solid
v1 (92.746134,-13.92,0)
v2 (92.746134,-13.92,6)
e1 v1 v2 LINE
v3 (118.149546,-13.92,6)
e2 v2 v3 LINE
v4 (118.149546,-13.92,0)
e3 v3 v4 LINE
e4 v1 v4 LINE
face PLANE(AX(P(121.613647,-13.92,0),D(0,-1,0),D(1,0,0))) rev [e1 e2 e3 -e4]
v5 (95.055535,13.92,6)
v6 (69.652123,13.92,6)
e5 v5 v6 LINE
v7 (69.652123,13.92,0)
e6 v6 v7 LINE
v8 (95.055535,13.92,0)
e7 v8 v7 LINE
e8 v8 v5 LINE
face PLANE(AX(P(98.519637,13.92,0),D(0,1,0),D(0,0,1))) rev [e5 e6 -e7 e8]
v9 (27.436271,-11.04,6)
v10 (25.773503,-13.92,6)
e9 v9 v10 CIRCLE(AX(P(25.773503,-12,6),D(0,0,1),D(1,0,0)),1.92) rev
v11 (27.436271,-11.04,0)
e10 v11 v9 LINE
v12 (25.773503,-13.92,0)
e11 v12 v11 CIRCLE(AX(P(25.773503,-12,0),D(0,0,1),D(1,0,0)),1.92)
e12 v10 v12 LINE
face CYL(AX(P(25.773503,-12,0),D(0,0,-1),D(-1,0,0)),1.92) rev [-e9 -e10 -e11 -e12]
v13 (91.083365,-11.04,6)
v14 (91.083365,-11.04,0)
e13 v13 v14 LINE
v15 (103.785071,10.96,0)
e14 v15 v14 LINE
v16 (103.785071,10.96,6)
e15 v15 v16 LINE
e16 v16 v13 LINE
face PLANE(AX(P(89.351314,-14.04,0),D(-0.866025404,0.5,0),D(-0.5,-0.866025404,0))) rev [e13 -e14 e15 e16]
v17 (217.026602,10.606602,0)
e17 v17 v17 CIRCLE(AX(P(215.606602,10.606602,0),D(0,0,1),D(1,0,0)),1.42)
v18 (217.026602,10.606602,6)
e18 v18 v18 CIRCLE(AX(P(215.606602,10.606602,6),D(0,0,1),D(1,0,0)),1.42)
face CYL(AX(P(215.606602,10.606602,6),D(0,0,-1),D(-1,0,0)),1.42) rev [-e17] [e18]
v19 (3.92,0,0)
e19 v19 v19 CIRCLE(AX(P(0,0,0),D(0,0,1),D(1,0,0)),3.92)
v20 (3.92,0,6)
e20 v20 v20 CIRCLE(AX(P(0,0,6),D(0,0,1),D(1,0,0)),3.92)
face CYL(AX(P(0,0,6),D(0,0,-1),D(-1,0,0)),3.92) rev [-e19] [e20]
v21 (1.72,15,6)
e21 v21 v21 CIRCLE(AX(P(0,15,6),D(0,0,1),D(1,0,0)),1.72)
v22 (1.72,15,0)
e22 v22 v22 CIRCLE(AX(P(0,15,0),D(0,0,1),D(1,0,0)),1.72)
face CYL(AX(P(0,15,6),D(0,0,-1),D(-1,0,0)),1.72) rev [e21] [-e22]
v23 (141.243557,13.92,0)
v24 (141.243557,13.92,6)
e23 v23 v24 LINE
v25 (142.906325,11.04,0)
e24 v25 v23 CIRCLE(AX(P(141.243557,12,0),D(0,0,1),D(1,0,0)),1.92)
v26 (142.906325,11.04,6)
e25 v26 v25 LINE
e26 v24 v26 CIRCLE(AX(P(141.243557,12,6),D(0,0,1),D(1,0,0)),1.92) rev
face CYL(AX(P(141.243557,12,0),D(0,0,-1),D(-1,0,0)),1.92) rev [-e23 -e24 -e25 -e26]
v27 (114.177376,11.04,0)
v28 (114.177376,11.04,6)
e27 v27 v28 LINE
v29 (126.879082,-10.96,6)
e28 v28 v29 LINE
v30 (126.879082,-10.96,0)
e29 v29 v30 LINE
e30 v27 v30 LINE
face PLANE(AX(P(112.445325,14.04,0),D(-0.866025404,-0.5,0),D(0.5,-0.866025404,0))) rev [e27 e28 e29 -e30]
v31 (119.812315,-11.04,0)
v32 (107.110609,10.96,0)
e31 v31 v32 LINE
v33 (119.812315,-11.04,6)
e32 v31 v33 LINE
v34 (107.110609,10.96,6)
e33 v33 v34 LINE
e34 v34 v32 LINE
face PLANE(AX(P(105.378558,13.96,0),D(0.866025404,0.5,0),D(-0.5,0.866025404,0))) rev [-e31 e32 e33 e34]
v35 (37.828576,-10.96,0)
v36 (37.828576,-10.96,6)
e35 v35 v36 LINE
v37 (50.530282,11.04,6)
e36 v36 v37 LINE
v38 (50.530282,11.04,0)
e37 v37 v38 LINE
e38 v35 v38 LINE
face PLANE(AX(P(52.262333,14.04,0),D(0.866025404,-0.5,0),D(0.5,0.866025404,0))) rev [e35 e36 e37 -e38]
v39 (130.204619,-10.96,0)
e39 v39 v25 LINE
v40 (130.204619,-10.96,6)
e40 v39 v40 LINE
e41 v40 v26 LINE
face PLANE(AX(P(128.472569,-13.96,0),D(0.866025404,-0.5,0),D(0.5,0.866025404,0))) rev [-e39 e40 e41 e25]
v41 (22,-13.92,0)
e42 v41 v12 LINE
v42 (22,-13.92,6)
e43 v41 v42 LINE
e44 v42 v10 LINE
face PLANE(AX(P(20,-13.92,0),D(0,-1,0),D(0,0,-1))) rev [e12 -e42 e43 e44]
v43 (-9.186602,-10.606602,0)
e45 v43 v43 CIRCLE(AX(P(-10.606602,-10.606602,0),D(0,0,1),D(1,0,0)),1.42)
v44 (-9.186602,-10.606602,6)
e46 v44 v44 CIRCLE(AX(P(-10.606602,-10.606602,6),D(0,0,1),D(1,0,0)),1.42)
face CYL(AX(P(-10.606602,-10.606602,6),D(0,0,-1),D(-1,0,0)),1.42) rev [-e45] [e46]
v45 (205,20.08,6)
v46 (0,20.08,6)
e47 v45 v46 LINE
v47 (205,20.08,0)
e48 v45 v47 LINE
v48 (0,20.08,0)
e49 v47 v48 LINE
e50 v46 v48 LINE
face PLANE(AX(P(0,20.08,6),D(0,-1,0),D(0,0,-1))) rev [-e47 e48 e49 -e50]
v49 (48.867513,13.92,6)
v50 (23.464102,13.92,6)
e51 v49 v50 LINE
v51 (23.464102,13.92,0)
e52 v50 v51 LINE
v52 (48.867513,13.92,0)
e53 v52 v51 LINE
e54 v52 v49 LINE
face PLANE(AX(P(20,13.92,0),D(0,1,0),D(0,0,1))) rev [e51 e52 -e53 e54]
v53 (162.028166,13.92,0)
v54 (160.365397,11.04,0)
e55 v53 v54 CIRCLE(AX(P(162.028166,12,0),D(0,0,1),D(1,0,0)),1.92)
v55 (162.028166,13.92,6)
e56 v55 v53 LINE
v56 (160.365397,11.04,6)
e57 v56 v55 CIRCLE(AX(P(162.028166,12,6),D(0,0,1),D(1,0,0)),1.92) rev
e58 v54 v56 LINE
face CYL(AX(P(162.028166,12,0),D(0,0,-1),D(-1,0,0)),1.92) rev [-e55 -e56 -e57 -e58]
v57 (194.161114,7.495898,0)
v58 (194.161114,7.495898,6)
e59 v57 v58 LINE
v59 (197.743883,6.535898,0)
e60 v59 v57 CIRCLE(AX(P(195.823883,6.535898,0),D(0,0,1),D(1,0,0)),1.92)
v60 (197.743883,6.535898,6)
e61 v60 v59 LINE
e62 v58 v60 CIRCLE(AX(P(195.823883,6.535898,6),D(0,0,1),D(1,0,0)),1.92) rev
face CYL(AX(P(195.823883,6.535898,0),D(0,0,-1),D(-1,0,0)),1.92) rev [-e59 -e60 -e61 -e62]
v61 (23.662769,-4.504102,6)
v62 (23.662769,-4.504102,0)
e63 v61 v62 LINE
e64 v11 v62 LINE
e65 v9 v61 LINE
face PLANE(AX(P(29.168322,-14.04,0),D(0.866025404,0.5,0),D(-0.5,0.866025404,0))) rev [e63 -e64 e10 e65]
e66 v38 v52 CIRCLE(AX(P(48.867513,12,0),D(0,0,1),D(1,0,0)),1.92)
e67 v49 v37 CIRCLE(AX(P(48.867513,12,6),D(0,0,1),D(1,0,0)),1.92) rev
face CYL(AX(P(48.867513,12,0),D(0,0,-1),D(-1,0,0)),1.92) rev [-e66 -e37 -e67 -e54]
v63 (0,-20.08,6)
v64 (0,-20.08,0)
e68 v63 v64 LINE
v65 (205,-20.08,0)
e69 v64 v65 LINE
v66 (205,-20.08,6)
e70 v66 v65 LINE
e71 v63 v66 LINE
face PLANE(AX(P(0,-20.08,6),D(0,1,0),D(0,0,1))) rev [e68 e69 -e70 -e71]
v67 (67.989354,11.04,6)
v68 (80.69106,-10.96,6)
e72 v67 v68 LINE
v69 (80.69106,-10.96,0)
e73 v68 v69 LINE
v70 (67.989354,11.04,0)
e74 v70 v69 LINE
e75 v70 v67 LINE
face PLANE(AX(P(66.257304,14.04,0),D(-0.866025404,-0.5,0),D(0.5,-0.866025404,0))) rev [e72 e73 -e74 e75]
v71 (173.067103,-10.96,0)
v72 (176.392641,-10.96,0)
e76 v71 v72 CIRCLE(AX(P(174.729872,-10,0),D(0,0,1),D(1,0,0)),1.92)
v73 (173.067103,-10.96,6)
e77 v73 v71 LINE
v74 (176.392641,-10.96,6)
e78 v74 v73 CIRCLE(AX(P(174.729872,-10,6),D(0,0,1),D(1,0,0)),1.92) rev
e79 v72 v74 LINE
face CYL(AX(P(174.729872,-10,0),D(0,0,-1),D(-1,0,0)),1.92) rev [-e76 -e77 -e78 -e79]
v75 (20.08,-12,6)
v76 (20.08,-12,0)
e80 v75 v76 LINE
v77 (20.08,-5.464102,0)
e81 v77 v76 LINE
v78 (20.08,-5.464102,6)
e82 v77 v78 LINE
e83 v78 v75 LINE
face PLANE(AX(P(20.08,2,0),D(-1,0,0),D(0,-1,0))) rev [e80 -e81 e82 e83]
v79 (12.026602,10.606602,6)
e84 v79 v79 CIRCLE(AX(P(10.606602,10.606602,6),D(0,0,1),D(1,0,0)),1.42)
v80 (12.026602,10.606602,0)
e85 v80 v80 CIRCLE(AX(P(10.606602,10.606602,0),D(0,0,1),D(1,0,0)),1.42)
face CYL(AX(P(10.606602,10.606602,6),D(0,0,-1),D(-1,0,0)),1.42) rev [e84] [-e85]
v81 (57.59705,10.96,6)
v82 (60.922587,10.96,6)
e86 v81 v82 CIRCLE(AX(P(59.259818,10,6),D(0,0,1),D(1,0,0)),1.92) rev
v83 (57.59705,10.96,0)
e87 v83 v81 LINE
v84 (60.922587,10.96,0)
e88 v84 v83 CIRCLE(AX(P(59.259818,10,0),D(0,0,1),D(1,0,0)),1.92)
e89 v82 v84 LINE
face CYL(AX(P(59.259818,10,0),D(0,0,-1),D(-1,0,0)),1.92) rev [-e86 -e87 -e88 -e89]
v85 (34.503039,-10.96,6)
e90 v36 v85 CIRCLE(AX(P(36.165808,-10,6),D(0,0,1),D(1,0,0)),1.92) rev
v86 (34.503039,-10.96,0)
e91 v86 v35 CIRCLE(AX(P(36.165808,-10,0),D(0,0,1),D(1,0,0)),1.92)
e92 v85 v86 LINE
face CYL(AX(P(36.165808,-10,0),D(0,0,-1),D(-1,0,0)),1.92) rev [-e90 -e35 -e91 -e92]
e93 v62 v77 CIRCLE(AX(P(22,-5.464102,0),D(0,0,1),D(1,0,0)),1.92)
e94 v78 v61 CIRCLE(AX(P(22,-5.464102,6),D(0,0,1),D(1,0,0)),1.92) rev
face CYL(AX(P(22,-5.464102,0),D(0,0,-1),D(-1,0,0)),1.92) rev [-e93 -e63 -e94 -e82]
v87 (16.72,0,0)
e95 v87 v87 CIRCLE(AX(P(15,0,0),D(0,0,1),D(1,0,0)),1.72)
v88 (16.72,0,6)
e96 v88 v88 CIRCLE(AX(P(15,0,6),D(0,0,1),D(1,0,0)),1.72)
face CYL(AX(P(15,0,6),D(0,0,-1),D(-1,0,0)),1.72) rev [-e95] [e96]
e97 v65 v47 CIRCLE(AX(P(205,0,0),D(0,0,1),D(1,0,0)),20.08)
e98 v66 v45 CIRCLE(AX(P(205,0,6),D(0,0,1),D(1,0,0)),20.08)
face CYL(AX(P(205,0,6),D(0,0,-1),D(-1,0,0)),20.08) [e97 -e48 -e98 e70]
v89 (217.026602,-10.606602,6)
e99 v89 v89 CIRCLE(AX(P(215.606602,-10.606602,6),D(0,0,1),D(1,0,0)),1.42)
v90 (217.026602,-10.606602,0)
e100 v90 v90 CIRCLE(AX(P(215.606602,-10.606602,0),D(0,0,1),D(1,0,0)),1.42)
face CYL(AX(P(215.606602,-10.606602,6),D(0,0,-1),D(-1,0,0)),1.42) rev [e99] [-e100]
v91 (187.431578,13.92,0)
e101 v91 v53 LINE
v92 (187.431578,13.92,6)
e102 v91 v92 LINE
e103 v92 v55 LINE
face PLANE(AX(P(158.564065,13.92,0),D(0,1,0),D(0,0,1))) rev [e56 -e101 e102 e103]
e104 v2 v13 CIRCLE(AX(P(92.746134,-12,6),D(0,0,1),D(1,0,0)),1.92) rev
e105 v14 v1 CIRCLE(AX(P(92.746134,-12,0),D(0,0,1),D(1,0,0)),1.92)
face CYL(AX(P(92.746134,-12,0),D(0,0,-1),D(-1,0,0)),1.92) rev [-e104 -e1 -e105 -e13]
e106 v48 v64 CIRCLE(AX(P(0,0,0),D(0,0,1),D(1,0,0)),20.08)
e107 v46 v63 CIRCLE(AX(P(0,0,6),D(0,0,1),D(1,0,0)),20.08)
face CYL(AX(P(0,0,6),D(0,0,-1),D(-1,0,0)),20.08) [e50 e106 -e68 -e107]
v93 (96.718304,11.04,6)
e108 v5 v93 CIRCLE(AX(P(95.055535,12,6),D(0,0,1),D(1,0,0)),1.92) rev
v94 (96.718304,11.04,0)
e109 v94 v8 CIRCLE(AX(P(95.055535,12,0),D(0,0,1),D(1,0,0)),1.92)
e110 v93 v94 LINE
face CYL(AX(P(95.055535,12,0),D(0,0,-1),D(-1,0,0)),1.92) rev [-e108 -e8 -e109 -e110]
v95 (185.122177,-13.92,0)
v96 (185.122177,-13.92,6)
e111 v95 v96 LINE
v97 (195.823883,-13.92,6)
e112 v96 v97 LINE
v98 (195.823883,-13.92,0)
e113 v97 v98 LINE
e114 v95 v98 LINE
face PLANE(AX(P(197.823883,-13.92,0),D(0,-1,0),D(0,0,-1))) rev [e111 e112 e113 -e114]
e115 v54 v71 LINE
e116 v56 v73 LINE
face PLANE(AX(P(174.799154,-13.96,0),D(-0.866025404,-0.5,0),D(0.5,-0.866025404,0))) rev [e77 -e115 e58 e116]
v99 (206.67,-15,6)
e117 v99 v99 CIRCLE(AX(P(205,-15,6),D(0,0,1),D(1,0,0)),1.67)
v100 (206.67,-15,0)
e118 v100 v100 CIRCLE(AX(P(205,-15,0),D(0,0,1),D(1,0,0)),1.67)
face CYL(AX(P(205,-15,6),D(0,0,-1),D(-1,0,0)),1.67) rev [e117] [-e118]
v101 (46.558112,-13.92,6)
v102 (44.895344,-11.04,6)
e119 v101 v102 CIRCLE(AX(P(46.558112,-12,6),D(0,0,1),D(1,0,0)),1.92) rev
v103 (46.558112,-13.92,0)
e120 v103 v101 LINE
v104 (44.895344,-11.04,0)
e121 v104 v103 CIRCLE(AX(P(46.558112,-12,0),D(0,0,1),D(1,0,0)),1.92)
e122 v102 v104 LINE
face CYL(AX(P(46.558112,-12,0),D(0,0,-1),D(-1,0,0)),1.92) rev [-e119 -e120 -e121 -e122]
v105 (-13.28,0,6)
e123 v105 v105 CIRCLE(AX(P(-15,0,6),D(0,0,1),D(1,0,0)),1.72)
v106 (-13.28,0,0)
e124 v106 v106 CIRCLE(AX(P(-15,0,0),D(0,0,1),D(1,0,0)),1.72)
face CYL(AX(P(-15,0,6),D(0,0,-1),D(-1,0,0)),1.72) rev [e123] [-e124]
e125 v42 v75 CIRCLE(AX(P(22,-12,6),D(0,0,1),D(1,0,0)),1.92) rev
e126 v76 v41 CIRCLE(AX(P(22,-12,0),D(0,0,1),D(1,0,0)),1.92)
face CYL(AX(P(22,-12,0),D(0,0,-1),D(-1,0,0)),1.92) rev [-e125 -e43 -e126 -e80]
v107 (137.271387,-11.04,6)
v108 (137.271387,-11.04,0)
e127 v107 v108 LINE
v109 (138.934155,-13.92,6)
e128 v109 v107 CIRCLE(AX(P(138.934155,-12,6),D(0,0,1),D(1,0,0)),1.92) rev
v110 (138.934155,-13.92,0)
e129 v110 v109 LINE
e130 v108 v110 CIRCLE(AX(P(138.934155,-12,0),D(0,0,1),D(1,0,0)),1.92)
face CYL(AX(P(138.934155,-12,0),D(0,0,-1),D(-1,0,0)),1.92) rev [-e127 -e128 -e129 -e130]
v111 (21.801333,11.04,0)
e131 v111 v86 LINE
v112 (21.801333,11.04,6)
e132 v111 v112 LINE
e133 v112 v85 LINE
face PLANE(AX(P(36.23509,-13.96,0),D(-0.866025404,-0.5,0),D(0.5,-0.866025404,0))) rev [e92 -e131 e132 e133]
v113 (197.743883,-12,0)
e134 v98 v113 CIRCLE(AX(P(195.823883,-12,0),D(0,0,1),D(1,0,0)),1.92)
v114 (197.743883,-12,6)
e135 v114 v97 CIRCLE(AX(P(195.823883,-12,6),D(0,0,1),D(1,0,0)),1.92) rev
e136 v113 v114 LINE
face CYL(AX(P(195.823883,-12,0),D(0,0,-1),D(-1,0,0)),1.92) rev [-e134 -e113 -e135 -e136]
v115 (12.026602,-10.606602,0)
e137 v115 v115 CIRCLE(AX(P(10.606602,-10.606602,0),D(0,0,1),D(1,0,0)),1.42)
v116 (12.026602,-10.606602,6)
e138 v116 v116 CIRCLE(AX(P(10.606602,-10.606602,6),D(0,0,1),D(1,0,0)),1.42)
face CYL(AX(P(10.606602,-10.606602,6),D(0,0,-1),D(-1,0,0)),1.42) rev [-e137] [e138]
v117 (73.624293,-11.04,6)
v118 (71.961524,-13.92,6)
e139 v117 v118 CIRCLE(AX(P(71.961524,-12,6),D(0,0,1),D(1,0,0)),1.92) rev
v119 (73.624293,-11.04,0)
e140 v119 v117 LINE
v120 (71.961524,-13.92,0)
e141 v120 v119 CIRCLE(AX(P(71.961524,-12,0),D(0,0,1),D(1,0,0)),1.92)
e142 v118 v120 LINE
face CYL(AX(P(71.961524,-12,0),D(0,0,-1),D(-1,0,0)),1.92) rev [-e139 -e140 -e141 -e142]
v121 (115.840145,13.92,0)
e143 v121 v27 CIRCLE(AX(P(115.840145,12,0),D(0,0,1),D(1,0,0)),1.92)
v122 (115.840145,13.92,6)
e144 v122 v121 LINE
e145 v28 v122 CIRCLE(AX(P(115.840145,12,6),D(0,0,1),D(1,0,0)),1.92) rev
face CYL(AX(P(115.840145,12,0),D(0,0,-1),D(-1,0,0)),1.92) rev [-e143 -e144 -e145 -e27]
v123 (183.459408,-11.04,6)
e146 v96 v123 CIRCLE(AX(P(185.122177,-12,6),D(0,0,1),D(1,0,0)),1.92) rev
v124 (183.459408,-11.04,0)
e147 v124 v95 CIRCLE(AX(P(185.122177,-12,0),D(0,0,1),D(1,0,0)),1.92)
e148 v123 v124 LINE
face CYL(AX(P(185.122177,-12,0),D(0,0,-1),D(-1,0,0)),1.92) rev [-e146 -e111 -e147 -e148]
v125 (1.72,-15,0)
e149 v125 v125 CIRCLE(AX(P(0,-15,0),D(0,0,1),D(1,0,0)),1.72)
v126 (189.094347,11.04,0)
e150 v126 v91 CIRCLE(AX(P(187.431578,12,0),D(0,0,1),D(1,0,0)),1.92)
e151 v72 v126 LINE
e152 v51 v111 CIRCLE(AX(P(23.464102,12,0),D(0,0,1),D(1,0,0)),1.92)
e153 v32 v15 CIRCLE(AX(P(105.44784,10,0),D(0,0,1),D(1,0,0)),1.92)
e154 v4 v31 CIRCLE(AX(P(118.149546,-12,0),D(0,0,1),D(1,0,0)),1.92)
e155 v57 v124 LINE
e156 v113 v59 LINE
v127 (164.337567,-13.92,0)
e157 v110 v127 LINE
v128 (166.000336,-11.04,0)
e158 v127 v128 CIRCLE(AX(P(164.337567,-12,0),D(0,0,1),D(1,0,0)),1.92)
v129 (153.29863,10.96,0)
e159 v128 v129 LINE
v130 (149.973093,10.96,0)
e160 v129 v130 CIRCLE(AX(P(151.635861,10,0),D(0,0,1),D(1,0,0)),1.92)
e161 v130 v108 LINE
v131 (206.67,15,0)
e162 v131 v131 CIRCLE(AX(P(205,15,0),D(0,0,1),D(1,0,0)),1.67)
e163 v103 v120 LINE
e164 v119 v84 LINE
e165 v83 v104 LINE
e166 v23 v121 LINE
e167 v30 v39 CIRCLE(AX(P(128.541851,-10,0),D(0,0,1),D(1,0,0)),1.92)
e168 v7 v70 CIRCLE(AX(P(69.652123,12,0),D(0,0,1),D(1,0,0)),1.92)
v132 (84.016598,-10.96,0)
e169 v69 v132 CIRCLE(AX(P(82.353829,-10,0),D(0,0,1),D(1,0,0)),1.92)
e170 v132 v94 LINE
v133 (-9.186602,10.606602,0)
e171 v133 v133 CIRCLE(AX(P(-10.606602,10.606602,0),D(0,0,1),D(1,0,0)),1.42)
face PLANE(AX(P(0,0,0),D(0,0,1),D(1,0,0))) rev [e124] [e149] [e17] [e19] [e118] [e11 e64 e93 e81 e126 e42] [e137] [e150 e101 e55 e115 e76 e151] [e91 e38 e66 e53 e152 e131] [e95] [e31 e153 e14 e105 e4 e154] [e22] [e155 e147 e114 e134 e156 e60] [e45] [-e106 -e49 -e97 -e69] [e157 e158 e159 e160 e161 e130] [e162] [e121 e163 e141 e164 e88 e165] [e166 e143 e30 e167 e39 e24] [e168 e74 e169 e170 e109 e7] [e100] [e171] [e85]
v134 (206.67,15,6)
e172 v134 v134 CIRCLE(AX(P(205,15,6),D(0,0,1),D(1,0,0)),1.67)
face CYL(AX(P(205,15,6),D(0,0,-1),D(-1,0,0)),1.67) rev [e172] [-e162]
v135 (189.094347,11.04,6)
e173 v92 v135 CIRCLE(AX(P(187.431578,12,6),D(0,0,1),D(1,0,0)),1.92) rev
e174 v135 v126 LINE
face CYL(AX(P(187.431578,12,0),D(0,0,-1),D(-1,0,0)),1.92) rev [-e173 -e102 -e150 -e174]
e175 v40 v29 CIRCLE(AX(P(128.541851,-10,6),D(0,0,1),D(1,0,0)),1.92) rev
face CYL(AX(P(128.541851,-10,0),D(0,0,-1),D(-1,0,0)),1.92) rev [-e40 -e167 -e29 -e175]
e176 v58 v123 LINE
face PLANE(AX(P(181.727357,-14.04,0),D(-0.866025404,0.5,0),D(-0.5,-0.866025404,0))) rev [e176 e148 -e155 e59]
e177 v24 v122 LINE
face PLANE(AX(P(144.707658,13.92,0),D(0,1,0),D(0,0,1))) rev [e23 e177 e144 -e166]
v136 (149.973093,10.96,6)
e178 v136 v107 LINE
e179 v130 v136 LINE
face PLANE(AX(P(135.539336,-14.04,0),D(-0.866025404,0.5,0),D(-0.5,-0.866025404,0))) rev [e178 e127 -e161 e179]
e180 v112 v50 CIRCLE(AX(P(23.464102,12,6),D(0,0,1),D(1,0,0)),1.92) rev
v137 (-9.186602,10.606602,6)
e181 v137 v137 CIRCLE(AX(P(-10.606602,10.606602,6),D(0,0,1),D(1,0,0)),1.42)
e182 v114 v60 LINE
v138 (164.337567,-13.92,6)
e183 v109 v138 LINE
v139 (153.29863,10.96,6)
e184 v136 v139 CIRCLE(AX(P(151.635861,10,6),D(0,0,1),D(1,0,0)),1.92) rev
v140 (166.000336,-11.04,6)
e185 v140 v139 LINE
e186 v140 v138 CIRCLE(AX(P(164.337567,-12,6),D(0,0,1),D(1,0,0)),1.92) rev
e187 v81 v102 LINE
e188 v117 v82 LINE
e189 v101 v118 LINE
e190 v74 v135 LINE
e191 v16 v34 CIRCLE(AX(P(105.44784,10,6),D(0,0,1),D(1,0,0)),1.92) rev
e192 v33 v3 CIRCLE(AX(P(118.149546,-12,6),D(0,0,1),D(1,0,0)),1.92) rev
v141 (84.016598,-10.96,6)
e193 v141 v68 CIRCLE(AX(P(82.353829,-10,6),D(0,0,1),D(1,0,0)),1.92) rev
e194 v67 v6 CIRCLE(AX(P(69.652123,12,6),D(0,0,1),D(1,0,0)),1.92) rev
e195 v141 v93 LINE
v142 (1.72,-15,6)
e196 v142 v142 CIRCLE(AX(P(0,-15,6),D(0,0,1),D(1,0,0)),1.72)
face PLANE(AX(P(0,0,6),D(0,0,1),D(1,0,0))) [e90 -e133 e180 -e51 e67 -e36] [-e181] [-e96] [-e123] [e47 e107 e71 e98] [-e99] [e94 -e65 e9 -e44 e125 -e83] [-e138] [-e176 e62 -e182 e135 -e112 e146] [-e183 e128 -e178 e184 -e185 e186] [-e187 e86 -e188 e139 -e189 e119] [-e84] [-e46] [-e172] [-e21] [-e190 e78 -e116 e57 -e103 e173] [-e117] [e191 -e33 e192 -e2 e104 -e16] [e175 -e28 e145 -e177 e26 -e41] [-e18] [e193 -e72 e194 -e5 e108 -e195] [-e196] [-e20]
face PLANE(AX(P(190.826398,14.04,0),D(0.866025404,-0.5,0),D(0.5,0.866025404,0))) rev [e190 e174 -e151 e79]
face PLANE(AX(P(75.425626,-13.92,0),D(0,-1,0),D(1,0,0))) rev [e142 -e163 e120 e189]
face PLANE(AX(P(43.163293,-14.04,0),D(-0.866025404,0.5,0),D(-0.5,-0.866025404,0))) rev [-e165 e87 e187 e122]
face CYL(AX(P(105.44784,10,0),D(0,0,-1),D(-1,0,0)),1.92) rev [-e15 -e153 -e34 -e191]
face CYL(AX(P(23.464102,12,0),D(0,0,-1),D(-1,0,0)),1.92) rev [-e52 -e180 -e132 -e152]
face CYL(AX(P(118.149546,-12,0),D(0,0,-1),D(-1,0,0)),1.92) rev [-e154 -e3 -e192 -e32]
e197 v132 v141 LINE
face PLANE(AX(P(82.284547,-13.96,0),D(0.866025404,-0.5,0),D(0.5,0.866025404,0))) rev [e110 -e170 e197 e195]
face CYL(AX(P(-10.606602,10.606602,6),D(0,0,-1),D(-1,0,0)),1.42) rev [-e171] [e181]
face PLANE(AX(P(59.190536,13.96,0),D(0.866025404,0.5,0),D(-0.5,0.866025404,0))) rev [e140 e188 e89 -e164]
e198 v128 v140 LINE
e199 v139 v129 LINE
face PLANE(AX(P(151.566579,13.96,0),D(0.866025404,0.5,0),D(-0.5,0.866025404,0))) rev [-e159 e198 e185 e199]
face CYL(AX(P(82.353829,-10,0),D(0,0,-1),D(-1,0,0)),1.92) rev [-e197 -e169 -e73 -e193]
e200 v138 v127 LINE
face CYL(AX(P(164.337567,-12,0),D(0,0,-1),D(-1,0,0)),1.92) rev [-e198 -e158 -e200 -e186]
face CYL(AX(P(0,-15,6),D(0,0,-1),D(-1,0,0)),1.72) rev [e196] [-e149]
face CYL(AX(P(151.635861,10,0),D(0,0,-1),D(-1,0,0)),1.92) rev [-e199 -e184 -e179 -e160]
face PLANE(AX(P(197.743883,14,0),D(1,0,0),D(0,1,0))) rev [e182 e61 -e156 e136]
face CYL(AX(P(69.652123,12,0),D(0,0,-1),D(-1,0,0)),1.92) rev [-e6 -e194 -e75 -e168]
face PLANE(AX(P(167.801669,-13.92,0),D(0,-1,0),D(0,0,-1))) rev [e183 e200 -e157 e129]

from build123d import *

# Parameters (mm, degrees)
SKETCH1_R              = 4
SKETCH1_R_2            = 1.75
SKETCH1_R_3            = 1.5
SKETCH1_R_4            = 1.8
BOSS_EXTRUDE1_DEPTH    = 6
CUT_EXTRUDE1_DEPTH     = 226.966811722
FILLET1_R              = 2
MOVE_FACE1_OUTLINE_R   = 4
MOVE_FACE1_OUTLINE_R_2 = 3.92
MOVE_FACE1_OUTLINE_R_3 = 1.75
MOVE_FACE1_OUTLINE_R_4 = 1.67
MOVE_FACE1_OUTLINE_R_5 = 1.5
MOVE_FACE1_OUTLINE_R_6 = 1.42
MOVE_FACE1_OUTLINE_R_7 = 1.8
MOVE_FACE1_OUTLINE_R_8 = 1.72
MOVE_FACE1_DEPTH       = 6


# Read off the part's stored shape, not the designer's step: Move Face1
with BuildPart() as part:
    # Sketch1 → Boss-Extrude1 (new body)
    with BuildSketch(Plane.XY):
        with BuildLine():
            Line((0, -20), (205, -20))
            ThreePointArc((205, -20), (225, 0), (205, 20))
            Line((205, 20), (0, 20))
            ThreePointArc((0, 20), (-20, 0), (0, -20))
        make_face()
        Circle(SKETCH1_R, mode=Mode.SUBTRACT)
        with Locations((205, -15)):
            Circle(SKETCH1_R_2, mode=Mode.SUBTRACT)
        with Locations((215.606601718, -10.606601718)):
            Circle(SKETCH1_R_3, mode=Mode.SUBTRACT)
        with Locations((205, 15)):
            Circle(SKETCH1_R_2, mode=Mode.SUBTRACT)
        with Locations((215.606601718, 10.606601718)):
            Circle(SKETCH1_R_3, mode=Mode.SUBTRACT)
        with Locations((0, -15)):
            Circle(SKETCH1_R_4, mode=Mode.SUBTRACT)
        with Locations((10.606601718, -10.606601718)):
            Circle(SKETCH1_R_3, mode=Mode.SUBTRACT)
        with Locations((-15, 0)):
            Circle(SKETCH1_R_4, mode=Mode.SUBTRACT)
        with Locations((-10.606601718, -10.606601718)):
            Circle(SKETCH1_R_3, mode=Mode.SUBTRACT)
        with Locations((0, 15)):
            Circle(SKETCH1_R_4, mode=Mode.SUBTRACT)
        with Locations((-10.606601718, 10.606601718)):
            Circle(SKETCH1_R_3, mode=Mode.SUBTRACT)
        with Locations((15, 0)):
            Circle(SKETCH1_R_4, mode=Mode.SUBTRACT)
        with Locations((10.606601718, 10.606601718)):
            Circle(SKETCH1_R_3, mode=Mode.SUBTRACT)
    extrude(amount=BOSS_EXTRUDE1_DEPTH)

    # Sketch2 → Cut-Extrude1 (cut, through all)
    with BuildSketch(Plane.XY.offset(6)):
        Polygon((20, 14), (52.331615075, 14), (36.165807537, -14), align=None)
        Polygon((43.094010768, -14), (59.259818305, 14), (75.425625842, -14), align=None)
        Polygon((66.188021535, 14), (82.353829072, -14), (98.51963661, 14), align=None)
        Polygon((89.282032303, -14), (105.44783984, 14), (121.613647377, -14), align=None)
        Polygon((112.37604307, 14), (128.541850608, -14), (144.707658145, 14), align=None)
        Polygon((20, 2), (20, -14), (29.237604307, -14), align=None)
        Polygon((135.470053838, -14), (151.635861375, 14), (167.801668913, -14), align=None)
        Polygon((174.729872143, -14), (158.564064606, 14), (190.89567968, 14), align=None)
        Polygon((181.658075373, -14), (197.82388291, 14), (197.82388291, -14), align=None)
    extrude(amount=-CUT_EXTRUDE1_DEPTH, mode=Mode.SUBTRACT)

    # Fillet1
    fillet1_edges = [part.edges().sort_by_distance(p)[0] for p in [
        (121.613647377, -14, 3),
        (89.282032303, -14, 3),
        (105.44783984, 14, 3),
        (112.37604307, 14, 3),
        (144.707658145, 14, 3),
        (128.541850608, -14, 3),
        (20, 2, 3),
        (29.237604307, -14, 3),
        (20, -14, 3),
        (167.801668913, -14, 3),
        (135.470053838, -14, 3),
        (151.635861375, 14, 3),
        (190.89567968, 14, 3),
        (174.729872143, -14, 3),
        (158.564064606, 14, 3),
        (197.82388291, -14, 3),
        (181.658075373, -14, 3),
        (197.82388291, 14, 3),
        (36.165807537, -14, 3),
        (20, 14, 3),
        (52.331615075, 14, 3),
        (75.425625842, -14, 3),
        (43.094010768, -14, 3),
        (59.259818305, 14, 3),
        (66.188021535, 14, 3),
        (98.51963661, 14, 3),
        (82.353829072, -14, 3),
    ]]
    fillet(fillet1_edges, radius=FILLET1_R)

    # Move Face1 outline → Move Face1 (add)
    # profile 1 of 23: a face of its own
    with BuildSketch(Plane.XY):
        with BuildLine():
            ThreePointArc((0, 20.08), (-20.08, 0), (0, -20.08))
            Line((0, -20.08), (205, -20.08))
            ThreePointArc((205, -20.08), (225.08, 0), (205, 20.08))
            Line((205, 20.08), (0, 20.08))
        make_face()
        with BuildLine():
            Line((205, -20), (0, -20))
            ThreePointArc((0, -20), (-20, 0), (0, 20))
            Line((0, 20), (205, 20))
            ThreePointArc((205, 20), (225, 0), (205, -20))
        make_face(mode=Mode.SUBTRACT)
    # profile 2 of 23: a face of its own
    with BuildSketch(Plane.XY):
        Circle(MOVE_FACE1_OUTLINE_R)
        Circle(MOVE_FACE1_OUTLINE_R_2, mode=Mode.SUBTRACT)
    # profile 3 of 23: a face of its own
    with BuildSketch(Plane.XY):
        with Locations((205, -15)):
            Circle(MOVE_FACE1_OUTLINE_R_3)
        with Locations((205, -15)):
            Circle(MOVE_FACE1_OUTLINE_R_4, mode=Mode.SUBTRACT)
    # profile 4 of 23: a face of its own
    with BuildSketch(Plane.XY):
        with Locations((215.606601718, -10.606601718)):
            Circle(MOVE_FACE1_OUTLINE_R_5)
        with Locations((215.606601718, -10.606601718)):
            Circle(MOVE_FACE1_OUTLINE_R_6, mode=Mode.SUBTRACT)
    # profile 5 of 23: a face of its own
    with BuildSketch(Plane.XY):
        with Locations((205, 15)):
            Circle(MOVE_FACE1_OUTLINE_R_3)
        with Locations((205, 15)):
            Circle(MOVE_FACE1_OUTLINE_R_4, mode=Mode.SUBTRACT)
    # profile 6 of 23: a face of its own
    with BuildSketch(Plane.XY):
        with Locations((215.606601718, 10.606601718)):
            Circle(MOVE_FACE1_OUTLINE_R_5)
        with Locations((215.606601718, 10.606601718)):
            Circle(MOVE_FACE1_OUTLINE_R_6, mode=Mode.SUBTRACT)
    # profile 7 of 23: a face of its own
    with BuildSketch(Plane.XY):
        with Locations((0, -15)):
            Circle(MOVE_FACE1_OUTLINE_R_7)
        with Locations((0, -15)):
            Circle(MOVE_FACE1_OUTLINE_R_8, mode=Mode.SUBTRACT)
    # profile 8 of 23: a face of its own
    with BuildSketch(Plane.XY):
        with Locations((10.606601718, -10.606601718)):
            Circle(MOVE_FACE1_OUTLINE_R_5)
        with Locations((10.606601718, -10.606601718)):
            Circle(MOVE_FACE1_OUTLINE_R_6, mode=Mode.SUBTRACT)
    # profile 9 of 23: a face of its own
    with BuildSketch(Plane.XY):
        with Locations((-15, 0)):
            Circle(MOVE_FACE1_OUTLINE_R_7)
        with Locations((-15, 0)):
            Circle(MOVE_FACE1_OUTLINE_R_8, mode=Mode.SUBTRACT)
    # profile 10 of 23: a face of its own
    with BuildSketch(Plane.XY):
        with Locations((-10.606601718, -10.606601718)):
            Circle(MOVE_FACE1_OUTLINE_R_5)
        with Locations((-10.606601718, -10.606601718)):
            Circle(MOVE_FACE1_OUTLINE_R_6, mode=Mode.SUBTRACT)
    # profile 11 of 23: a face of its own
    with BuildSketch(Plane.XY):
        with Locations((0, 15)):
            Circle(MOVE_FACE1_OUTLINE_R_7)
        with Locations((0, 15)):
            Circle(MOVE_FACE1_OUTLINE_R_8, mode=Mode.SUBTRACT)
    # profile 12 of 23: a face of its own
    with BuildSketch(Plane.XY):
        with Locations((-10.606601718, 10.606601718)):
            Circle(MOVE_FACE1_OUTLINE_R_5)
        with Locations((-10.606601718, 10.606601718)):
            Circle(MOVE_FACE1_OUTLINE_R_6, mode=Mode.SUBTRACT)
    # profile 13 of 23: a face of its own
    with BuildSketch(Plane.XY):
        with Locations((15, 0)):
            Circle(MOVE_FACE1_OUTLINE_R_7)
        with Locations((15, 0)):
            Circle(MOVE_FACE1_OUTLINE_R_8, mode=Mode.SUBTRACT)
    # profile 14 of 23: a face of its own
    with BuildSketch(Plane.XY):
        with Locations((10.606601718, 10.606601718)):
            Circle(MOVE_FACE1_OUTLINE_R_5)
        with Locations((10.606601718, 10.606601718)):
            Circle(MOVE_FACE1_OUTLINE_R_6, mode=Mode.SUBTRACT)
    # profile 15 of 23: a face of its own
    with BuildSketch(Plane.XY):
        with BuildLine():
            ThreePointArc((23.464101615, 14), (21.732050808, 13), (21.732050808, 11))
            Line((21.732050808, 11), (34.43375673, -11))
            ThreePointArc((34.43375673, -11), (36.165807538, -12), (37.897858345, -11))
            Line((37.897858345, -11), (50.599564267, 11))
            ThreePointArc((50.599564267, 11), (50.599564267, 13), (48.867513459, 14))
            Line((48.867513459, 14), (23.464101615, 14))
        make_face()
        with BuildLine():
            Line((34.503038762, -10.96), (21.80133284, 11.04))
            ThreePointArc((21.80133284, 11.04), (21.80133284, 12.96), (23.464101615, 13.92))
            Line((23.464101615, 13.92), (48.867513459, 13.92))
            ThreePointArc((48.867513459, 13.92), (50.530282235, 12.96), (50.530282235, 11.04))
            Line((50.530282235, 11.04), (37.828576313, -10.96))
            ThreePointArc((37.828576313, -10.96), (36.165807538, -11.92), (34.503038762, -10.96))
        make_face(mode=Mode.SUBTRACT)
    # profile 16 of 23: a face of its own
    with BuildSketch(Plane.XY):
        with BuildLine():
            ThreePointArc((96.787585802, 11), (96.787585802, 13), (95.055534995, 14))
            Line((95.055534995, 14), (69.65212315, 14))
            ThreePointArc((69.65212315, 14), (67.920072343, 13), (67.920072343, 11))
            Line((67.920072343, 11), (80.621778265, -11))
            ThreePointArc((80.621778265, -11), (82.353829072, -12), (84.08587988, -11))
            Line((84.08587988, -11), (96.787585802, 11))
        make_face()
        with BuildLine():
            Line((69.65212315, 13.92), (95.055534995, 13.92))
            ThreePointArc((95.055534995, 13.92), (96.71830377, 12.96), (96.71830377, 11.04))
            Line((96.71830377, 11.04), (84.016597848, -10.96))
            ThreePointArc((84.016597848, -10.96), (82.353829073, -11.92), (80.691060297, -10.96))
            Line((80.691060297, -10.96), (67.989354375, 11.04))
            ThreePointArc((67.989354375, 11.04), (67.989354375, 12.96), (69.65212315, 13.92))
        make_face(mode=Mode.SUBTRACT)
    # profile 17 of 23: a face of its own
    with BuildSketch(Plane.XY):
        with BuildLine():
            ThreePointArc((142.975607337, 11), (142.975607337, 13), (141.24355653, 14))
            Line((141.24355653, 14), (115.840144685, 14))
            ThreePointArc((115.840144685, 14), (114.108093878, 13), (114.108093878, 11))
            Line((114.108093878, 11), (126.8097998, -11))
            ThreePointArc((126.8097998, -11), (128.541850608, -12), (130.273901415, -11))
            Line((130.273901415, -11), (142.975607337, 11))
        make_face()
        with BuildLine():
            Line((115.840144685, 13.92), (141.24355653, 13.92))
            ThreePointArc((141.24355653, 13.92), (142.906325305, 12.96), (142.906325305, 11.04))
            Line((142.906325305, 11.04), (130.204619383, -10.96))
            ThreePointArc((130.204619383, -10.96), (128.541850608, -11.92), (126.879081832, -10.96))
            Line((126.879081832, -10.96), (114.17737591, 11.04))
            ThreePointArc((114.17737591, 11.04), (114.17737591, 12.96), (115.840144685, 13.92))
        make_face(mode=Mode.SUBTRACT)
    # profile 18 of 23: a face of its own
    with BuildSketch(Plane.XY):
        with BuildLine():
            ThreePointArc((189.163628873, 11), (189.163628873, 13), (187.431578065, 14))
            Line((187.431578065, 14), (162.028166221, 14))
            ThreePointArc((162.028166221, 14), (160.296115413, 13), (160.296115413, 11))
            Line((160.296115413, 11), (172.997821335, -11))
            ThreePointArc((172.997821335, -11), (174.729872142, -12), (176.46192295, -11))
            Line((176.46192295, -11), (189.163628873, 11))
        make_face()
        with BuildLine():
            Line((162.028166221, 13.92), (187.431578065, 13.92))
            ThreePointArc((187.431578065, 13.92), (189.09434684, 12.96), (189.09434684, 11.04))
            Line((189.09434684, 11.04), (176.392640918, -10.96))
            ThreePointArc((176.392640918, -10.96), (174.729872143, -11.92), (173.067103368, -10.96))
            Line((173.067103368, -10.96), (160.365397445, 11.04))
            ThreePointArc((160.365397445, 11.04), (160.365397445, 12.96), (162.028166221, 13.92))
        make_face(mode=Mode.SUBTRACT)
    # profile 19 of 23: a face of its own
    with BuildSketch(Plane.XY):
        with BuildLine():
            ThreePointArc((44.826061575, -11), (44.826061575, -13), (46.558112383, -14))
            Line((46.558112383, -14), (71.961524227, -14))
            ThreePointArc((71.961524227, -14), (73.693575035, -13), (73.693575035, -11))
            Line((73.693575035, -11), (60.991869112, 11))
            ThreePointArc((60.991869112, 11), (59.259818305, 12), (57.527767497, 11))
            Line((57.527767497, 11), (44.826061575, -11))
        make_face()
        with BuildLine():
            Line((71.961524227, -13.92), (46.558112383, -13.92))
            ThreePointArc((46.558112383, -13.92), (44.895343607, -12.96), (44.895343607, -11.04))
            Line((44.895343607, -11.04), (57.59704953, 10.96))
            ThreePointArc((57.59704953, 10.96), (59.259818305, 11.92), (60.92258708, 10.96))
            Line((60.92258708, 10.96), (73.624293002, -11.04))
            ThreePointArc((73.624293002, -11.04), (73.624293002, -12.96), (71.961524227, -13.92))
        make_face(mode=Mode.SUBTRACT)
    # profile 20 of 23: a face of its own
    with BuildSketch(Plane.XY):
        with BuildLine():
            ThreePointArc((91.01408311, -11), (91.01408311, -13), (92.746133918, -14))
            Line((92.746133918, -14), (118.149545762, -14))
            ThreePointArc((118.149545762, -14), (119.88159657, -13), (119.88159657, -11))
            Line((119.88159657, -11), (107.179890648, 11))
            ThreePointArc((107.179890648, 11), (105.44783984, 12), (103.715789032, 11))
            Line((103.715789032, 11), (91.01408311, -11))
        make_face()
        with BuildLine():
            Line((118.149545762, -13.92), (92.746133918, -13.92))
            ThreePointArc((92.746133918, -13.92), (91.083365143, -12.96), (91.083365143, -11.04))
            Line((91.083365143, -11.04), (103.785071065, 10.96))
            ThreePointArc((103.785071065, 10.96), (105.44783984, 11.92), (107.110608615, 10.96))
            Line((107.110608615, 10.96), (119.812314538, -11.04))
            ThreePointArc((119.812314538, -11.04), (119.812314538, -12.96), (118.149545762, -13.92))
        make_face(mode=Mode.SUBTRACT)
    # profile 21 of 23: a face of its own
    with BuildSketch(Plane.XY):
        with BuildLine():
            ThreePointArc((20, -12), (20.585786438, -13.414213562), (22, -14))
            Line((22, -14), (25.773502692, -14))
            ThreePointArc((25.773502692, -14), (27.505553499, -13), (27.505553499, -11))
            Line((27.505553499, -11), (23.732050808, -4.464101615))
            ThreePointArc((23.732050808, -4.464101615), (21.48236191, -3.532249963), (20, -5.464101615))
            Line((20, -5.464101615), (20, -12))
        make_face()
        with BuildLine():
            Line((25.773502692, -13.92), (22, -13.92))
            ThreePointArc((22, -13.92), (20.64235498, -13.35764502), (20.08, -12))
            Line((20.08, -12), (20.08, -5.464101615))
            ThreePointArc((20.08, -5.464101615), (21.503067433, -3.609524029), (23.662768775, -4.504101615))
            Line((23.662768775, -4.504101615), (27.436271467, -11.04))
            ThreePointArc((27.436271467, -11.04), (27.436271467, -12.96), (25.773502692, -13.92))
        make_face(mode=Mode.SUBTRACT)
    # profile 22 of 23: a face of its own
    with BuildSketch(Plane.XY):
        with BuildLine():
            ThreePointArc((137.202104645, -11), (137.202104645, -13), (138.934155453, -14))
            Line((138.934155453, -14), (164.337567297, -14))
            ThreePointArc((164.337567297, -14), (166.069618105, -13), (166.069618105, -11))
            Line((166.069618105, -11), (153.367912183, 11))
            ThreePointArc((153.367912183, 11), (151.635861376, 12), (149.903810568, 11))
            Line((149.903810568, 11), (137.202104645, -11))
        make_face()
        with BuildLine():
            Line((164.337567297, -13.92), (138.934155453, -13.92))
            ThreePointArc((138.934155453, -13.92), (137.271386678, -12.96), (137.271386678, -11.04))
            Line((137.271386678, -11.04), (149.9730926, 10.96))
            ThreePointArc((149.9730926, 10.96), (151.635861375, 11.92), (153.298630151, 10.96))
            Line((153.298630151, 10.96), (166.000336073, -11.04))
            ThreePointArc((166.000336073, -11.04), (166.000336073, -12.96), (164.337567297, -13.92))
        make_face(mode=Mode.SUBTRACT)
    # profile 23 of 23: a face of its own
    with BuildSketch(Plane.XY):
        with BuildLine():
            ThreePointArc((183.390126181, -11), (183.390126181, -13), (185.122176988, -14))
            Line((185.122176988, -14), (195.82388291, -14))
            ThreePointArc((195.82388291, -14), (197.238096473, -13.414213563), (197.82388291, -12))
            Line((197.82388291, -12), (197.82388291, 6.535898385))
            ThreePointArc((197.82388291, 6.535898385), (196.341521, 8.467750037), (194.091832103, 7.535898385))
            Line((194.091832103, 7.535898385), (183.390126181, -11))
        make_face()
        with BuildLine():
            Line((195.82388291, -13.92), (185.122176988, -13.92))
            ThreePointArc((185.122176988, -13.92), (183.459408213, -12.96), (183.459408213, -11.04))
            Line((183.459408213, -11.04), (194.161114135, 7.495898385))
            ThreePointArc((194.161114135, 7.495898385), (196.320815477, 8.390475971), (197.74388291, 6.535898385))
            Line((197.74388291, 6.535898385), (197.74388291, -12))
            ThreePointArc((197.74388291, -12), (197.18152793, -13.35764502), (195.82388291, -13.92))
        make_face(mode=Mode.SUBTRACT)
    extrude(amount=MOVE_FACE1_DEPTH)


solid = part.part
